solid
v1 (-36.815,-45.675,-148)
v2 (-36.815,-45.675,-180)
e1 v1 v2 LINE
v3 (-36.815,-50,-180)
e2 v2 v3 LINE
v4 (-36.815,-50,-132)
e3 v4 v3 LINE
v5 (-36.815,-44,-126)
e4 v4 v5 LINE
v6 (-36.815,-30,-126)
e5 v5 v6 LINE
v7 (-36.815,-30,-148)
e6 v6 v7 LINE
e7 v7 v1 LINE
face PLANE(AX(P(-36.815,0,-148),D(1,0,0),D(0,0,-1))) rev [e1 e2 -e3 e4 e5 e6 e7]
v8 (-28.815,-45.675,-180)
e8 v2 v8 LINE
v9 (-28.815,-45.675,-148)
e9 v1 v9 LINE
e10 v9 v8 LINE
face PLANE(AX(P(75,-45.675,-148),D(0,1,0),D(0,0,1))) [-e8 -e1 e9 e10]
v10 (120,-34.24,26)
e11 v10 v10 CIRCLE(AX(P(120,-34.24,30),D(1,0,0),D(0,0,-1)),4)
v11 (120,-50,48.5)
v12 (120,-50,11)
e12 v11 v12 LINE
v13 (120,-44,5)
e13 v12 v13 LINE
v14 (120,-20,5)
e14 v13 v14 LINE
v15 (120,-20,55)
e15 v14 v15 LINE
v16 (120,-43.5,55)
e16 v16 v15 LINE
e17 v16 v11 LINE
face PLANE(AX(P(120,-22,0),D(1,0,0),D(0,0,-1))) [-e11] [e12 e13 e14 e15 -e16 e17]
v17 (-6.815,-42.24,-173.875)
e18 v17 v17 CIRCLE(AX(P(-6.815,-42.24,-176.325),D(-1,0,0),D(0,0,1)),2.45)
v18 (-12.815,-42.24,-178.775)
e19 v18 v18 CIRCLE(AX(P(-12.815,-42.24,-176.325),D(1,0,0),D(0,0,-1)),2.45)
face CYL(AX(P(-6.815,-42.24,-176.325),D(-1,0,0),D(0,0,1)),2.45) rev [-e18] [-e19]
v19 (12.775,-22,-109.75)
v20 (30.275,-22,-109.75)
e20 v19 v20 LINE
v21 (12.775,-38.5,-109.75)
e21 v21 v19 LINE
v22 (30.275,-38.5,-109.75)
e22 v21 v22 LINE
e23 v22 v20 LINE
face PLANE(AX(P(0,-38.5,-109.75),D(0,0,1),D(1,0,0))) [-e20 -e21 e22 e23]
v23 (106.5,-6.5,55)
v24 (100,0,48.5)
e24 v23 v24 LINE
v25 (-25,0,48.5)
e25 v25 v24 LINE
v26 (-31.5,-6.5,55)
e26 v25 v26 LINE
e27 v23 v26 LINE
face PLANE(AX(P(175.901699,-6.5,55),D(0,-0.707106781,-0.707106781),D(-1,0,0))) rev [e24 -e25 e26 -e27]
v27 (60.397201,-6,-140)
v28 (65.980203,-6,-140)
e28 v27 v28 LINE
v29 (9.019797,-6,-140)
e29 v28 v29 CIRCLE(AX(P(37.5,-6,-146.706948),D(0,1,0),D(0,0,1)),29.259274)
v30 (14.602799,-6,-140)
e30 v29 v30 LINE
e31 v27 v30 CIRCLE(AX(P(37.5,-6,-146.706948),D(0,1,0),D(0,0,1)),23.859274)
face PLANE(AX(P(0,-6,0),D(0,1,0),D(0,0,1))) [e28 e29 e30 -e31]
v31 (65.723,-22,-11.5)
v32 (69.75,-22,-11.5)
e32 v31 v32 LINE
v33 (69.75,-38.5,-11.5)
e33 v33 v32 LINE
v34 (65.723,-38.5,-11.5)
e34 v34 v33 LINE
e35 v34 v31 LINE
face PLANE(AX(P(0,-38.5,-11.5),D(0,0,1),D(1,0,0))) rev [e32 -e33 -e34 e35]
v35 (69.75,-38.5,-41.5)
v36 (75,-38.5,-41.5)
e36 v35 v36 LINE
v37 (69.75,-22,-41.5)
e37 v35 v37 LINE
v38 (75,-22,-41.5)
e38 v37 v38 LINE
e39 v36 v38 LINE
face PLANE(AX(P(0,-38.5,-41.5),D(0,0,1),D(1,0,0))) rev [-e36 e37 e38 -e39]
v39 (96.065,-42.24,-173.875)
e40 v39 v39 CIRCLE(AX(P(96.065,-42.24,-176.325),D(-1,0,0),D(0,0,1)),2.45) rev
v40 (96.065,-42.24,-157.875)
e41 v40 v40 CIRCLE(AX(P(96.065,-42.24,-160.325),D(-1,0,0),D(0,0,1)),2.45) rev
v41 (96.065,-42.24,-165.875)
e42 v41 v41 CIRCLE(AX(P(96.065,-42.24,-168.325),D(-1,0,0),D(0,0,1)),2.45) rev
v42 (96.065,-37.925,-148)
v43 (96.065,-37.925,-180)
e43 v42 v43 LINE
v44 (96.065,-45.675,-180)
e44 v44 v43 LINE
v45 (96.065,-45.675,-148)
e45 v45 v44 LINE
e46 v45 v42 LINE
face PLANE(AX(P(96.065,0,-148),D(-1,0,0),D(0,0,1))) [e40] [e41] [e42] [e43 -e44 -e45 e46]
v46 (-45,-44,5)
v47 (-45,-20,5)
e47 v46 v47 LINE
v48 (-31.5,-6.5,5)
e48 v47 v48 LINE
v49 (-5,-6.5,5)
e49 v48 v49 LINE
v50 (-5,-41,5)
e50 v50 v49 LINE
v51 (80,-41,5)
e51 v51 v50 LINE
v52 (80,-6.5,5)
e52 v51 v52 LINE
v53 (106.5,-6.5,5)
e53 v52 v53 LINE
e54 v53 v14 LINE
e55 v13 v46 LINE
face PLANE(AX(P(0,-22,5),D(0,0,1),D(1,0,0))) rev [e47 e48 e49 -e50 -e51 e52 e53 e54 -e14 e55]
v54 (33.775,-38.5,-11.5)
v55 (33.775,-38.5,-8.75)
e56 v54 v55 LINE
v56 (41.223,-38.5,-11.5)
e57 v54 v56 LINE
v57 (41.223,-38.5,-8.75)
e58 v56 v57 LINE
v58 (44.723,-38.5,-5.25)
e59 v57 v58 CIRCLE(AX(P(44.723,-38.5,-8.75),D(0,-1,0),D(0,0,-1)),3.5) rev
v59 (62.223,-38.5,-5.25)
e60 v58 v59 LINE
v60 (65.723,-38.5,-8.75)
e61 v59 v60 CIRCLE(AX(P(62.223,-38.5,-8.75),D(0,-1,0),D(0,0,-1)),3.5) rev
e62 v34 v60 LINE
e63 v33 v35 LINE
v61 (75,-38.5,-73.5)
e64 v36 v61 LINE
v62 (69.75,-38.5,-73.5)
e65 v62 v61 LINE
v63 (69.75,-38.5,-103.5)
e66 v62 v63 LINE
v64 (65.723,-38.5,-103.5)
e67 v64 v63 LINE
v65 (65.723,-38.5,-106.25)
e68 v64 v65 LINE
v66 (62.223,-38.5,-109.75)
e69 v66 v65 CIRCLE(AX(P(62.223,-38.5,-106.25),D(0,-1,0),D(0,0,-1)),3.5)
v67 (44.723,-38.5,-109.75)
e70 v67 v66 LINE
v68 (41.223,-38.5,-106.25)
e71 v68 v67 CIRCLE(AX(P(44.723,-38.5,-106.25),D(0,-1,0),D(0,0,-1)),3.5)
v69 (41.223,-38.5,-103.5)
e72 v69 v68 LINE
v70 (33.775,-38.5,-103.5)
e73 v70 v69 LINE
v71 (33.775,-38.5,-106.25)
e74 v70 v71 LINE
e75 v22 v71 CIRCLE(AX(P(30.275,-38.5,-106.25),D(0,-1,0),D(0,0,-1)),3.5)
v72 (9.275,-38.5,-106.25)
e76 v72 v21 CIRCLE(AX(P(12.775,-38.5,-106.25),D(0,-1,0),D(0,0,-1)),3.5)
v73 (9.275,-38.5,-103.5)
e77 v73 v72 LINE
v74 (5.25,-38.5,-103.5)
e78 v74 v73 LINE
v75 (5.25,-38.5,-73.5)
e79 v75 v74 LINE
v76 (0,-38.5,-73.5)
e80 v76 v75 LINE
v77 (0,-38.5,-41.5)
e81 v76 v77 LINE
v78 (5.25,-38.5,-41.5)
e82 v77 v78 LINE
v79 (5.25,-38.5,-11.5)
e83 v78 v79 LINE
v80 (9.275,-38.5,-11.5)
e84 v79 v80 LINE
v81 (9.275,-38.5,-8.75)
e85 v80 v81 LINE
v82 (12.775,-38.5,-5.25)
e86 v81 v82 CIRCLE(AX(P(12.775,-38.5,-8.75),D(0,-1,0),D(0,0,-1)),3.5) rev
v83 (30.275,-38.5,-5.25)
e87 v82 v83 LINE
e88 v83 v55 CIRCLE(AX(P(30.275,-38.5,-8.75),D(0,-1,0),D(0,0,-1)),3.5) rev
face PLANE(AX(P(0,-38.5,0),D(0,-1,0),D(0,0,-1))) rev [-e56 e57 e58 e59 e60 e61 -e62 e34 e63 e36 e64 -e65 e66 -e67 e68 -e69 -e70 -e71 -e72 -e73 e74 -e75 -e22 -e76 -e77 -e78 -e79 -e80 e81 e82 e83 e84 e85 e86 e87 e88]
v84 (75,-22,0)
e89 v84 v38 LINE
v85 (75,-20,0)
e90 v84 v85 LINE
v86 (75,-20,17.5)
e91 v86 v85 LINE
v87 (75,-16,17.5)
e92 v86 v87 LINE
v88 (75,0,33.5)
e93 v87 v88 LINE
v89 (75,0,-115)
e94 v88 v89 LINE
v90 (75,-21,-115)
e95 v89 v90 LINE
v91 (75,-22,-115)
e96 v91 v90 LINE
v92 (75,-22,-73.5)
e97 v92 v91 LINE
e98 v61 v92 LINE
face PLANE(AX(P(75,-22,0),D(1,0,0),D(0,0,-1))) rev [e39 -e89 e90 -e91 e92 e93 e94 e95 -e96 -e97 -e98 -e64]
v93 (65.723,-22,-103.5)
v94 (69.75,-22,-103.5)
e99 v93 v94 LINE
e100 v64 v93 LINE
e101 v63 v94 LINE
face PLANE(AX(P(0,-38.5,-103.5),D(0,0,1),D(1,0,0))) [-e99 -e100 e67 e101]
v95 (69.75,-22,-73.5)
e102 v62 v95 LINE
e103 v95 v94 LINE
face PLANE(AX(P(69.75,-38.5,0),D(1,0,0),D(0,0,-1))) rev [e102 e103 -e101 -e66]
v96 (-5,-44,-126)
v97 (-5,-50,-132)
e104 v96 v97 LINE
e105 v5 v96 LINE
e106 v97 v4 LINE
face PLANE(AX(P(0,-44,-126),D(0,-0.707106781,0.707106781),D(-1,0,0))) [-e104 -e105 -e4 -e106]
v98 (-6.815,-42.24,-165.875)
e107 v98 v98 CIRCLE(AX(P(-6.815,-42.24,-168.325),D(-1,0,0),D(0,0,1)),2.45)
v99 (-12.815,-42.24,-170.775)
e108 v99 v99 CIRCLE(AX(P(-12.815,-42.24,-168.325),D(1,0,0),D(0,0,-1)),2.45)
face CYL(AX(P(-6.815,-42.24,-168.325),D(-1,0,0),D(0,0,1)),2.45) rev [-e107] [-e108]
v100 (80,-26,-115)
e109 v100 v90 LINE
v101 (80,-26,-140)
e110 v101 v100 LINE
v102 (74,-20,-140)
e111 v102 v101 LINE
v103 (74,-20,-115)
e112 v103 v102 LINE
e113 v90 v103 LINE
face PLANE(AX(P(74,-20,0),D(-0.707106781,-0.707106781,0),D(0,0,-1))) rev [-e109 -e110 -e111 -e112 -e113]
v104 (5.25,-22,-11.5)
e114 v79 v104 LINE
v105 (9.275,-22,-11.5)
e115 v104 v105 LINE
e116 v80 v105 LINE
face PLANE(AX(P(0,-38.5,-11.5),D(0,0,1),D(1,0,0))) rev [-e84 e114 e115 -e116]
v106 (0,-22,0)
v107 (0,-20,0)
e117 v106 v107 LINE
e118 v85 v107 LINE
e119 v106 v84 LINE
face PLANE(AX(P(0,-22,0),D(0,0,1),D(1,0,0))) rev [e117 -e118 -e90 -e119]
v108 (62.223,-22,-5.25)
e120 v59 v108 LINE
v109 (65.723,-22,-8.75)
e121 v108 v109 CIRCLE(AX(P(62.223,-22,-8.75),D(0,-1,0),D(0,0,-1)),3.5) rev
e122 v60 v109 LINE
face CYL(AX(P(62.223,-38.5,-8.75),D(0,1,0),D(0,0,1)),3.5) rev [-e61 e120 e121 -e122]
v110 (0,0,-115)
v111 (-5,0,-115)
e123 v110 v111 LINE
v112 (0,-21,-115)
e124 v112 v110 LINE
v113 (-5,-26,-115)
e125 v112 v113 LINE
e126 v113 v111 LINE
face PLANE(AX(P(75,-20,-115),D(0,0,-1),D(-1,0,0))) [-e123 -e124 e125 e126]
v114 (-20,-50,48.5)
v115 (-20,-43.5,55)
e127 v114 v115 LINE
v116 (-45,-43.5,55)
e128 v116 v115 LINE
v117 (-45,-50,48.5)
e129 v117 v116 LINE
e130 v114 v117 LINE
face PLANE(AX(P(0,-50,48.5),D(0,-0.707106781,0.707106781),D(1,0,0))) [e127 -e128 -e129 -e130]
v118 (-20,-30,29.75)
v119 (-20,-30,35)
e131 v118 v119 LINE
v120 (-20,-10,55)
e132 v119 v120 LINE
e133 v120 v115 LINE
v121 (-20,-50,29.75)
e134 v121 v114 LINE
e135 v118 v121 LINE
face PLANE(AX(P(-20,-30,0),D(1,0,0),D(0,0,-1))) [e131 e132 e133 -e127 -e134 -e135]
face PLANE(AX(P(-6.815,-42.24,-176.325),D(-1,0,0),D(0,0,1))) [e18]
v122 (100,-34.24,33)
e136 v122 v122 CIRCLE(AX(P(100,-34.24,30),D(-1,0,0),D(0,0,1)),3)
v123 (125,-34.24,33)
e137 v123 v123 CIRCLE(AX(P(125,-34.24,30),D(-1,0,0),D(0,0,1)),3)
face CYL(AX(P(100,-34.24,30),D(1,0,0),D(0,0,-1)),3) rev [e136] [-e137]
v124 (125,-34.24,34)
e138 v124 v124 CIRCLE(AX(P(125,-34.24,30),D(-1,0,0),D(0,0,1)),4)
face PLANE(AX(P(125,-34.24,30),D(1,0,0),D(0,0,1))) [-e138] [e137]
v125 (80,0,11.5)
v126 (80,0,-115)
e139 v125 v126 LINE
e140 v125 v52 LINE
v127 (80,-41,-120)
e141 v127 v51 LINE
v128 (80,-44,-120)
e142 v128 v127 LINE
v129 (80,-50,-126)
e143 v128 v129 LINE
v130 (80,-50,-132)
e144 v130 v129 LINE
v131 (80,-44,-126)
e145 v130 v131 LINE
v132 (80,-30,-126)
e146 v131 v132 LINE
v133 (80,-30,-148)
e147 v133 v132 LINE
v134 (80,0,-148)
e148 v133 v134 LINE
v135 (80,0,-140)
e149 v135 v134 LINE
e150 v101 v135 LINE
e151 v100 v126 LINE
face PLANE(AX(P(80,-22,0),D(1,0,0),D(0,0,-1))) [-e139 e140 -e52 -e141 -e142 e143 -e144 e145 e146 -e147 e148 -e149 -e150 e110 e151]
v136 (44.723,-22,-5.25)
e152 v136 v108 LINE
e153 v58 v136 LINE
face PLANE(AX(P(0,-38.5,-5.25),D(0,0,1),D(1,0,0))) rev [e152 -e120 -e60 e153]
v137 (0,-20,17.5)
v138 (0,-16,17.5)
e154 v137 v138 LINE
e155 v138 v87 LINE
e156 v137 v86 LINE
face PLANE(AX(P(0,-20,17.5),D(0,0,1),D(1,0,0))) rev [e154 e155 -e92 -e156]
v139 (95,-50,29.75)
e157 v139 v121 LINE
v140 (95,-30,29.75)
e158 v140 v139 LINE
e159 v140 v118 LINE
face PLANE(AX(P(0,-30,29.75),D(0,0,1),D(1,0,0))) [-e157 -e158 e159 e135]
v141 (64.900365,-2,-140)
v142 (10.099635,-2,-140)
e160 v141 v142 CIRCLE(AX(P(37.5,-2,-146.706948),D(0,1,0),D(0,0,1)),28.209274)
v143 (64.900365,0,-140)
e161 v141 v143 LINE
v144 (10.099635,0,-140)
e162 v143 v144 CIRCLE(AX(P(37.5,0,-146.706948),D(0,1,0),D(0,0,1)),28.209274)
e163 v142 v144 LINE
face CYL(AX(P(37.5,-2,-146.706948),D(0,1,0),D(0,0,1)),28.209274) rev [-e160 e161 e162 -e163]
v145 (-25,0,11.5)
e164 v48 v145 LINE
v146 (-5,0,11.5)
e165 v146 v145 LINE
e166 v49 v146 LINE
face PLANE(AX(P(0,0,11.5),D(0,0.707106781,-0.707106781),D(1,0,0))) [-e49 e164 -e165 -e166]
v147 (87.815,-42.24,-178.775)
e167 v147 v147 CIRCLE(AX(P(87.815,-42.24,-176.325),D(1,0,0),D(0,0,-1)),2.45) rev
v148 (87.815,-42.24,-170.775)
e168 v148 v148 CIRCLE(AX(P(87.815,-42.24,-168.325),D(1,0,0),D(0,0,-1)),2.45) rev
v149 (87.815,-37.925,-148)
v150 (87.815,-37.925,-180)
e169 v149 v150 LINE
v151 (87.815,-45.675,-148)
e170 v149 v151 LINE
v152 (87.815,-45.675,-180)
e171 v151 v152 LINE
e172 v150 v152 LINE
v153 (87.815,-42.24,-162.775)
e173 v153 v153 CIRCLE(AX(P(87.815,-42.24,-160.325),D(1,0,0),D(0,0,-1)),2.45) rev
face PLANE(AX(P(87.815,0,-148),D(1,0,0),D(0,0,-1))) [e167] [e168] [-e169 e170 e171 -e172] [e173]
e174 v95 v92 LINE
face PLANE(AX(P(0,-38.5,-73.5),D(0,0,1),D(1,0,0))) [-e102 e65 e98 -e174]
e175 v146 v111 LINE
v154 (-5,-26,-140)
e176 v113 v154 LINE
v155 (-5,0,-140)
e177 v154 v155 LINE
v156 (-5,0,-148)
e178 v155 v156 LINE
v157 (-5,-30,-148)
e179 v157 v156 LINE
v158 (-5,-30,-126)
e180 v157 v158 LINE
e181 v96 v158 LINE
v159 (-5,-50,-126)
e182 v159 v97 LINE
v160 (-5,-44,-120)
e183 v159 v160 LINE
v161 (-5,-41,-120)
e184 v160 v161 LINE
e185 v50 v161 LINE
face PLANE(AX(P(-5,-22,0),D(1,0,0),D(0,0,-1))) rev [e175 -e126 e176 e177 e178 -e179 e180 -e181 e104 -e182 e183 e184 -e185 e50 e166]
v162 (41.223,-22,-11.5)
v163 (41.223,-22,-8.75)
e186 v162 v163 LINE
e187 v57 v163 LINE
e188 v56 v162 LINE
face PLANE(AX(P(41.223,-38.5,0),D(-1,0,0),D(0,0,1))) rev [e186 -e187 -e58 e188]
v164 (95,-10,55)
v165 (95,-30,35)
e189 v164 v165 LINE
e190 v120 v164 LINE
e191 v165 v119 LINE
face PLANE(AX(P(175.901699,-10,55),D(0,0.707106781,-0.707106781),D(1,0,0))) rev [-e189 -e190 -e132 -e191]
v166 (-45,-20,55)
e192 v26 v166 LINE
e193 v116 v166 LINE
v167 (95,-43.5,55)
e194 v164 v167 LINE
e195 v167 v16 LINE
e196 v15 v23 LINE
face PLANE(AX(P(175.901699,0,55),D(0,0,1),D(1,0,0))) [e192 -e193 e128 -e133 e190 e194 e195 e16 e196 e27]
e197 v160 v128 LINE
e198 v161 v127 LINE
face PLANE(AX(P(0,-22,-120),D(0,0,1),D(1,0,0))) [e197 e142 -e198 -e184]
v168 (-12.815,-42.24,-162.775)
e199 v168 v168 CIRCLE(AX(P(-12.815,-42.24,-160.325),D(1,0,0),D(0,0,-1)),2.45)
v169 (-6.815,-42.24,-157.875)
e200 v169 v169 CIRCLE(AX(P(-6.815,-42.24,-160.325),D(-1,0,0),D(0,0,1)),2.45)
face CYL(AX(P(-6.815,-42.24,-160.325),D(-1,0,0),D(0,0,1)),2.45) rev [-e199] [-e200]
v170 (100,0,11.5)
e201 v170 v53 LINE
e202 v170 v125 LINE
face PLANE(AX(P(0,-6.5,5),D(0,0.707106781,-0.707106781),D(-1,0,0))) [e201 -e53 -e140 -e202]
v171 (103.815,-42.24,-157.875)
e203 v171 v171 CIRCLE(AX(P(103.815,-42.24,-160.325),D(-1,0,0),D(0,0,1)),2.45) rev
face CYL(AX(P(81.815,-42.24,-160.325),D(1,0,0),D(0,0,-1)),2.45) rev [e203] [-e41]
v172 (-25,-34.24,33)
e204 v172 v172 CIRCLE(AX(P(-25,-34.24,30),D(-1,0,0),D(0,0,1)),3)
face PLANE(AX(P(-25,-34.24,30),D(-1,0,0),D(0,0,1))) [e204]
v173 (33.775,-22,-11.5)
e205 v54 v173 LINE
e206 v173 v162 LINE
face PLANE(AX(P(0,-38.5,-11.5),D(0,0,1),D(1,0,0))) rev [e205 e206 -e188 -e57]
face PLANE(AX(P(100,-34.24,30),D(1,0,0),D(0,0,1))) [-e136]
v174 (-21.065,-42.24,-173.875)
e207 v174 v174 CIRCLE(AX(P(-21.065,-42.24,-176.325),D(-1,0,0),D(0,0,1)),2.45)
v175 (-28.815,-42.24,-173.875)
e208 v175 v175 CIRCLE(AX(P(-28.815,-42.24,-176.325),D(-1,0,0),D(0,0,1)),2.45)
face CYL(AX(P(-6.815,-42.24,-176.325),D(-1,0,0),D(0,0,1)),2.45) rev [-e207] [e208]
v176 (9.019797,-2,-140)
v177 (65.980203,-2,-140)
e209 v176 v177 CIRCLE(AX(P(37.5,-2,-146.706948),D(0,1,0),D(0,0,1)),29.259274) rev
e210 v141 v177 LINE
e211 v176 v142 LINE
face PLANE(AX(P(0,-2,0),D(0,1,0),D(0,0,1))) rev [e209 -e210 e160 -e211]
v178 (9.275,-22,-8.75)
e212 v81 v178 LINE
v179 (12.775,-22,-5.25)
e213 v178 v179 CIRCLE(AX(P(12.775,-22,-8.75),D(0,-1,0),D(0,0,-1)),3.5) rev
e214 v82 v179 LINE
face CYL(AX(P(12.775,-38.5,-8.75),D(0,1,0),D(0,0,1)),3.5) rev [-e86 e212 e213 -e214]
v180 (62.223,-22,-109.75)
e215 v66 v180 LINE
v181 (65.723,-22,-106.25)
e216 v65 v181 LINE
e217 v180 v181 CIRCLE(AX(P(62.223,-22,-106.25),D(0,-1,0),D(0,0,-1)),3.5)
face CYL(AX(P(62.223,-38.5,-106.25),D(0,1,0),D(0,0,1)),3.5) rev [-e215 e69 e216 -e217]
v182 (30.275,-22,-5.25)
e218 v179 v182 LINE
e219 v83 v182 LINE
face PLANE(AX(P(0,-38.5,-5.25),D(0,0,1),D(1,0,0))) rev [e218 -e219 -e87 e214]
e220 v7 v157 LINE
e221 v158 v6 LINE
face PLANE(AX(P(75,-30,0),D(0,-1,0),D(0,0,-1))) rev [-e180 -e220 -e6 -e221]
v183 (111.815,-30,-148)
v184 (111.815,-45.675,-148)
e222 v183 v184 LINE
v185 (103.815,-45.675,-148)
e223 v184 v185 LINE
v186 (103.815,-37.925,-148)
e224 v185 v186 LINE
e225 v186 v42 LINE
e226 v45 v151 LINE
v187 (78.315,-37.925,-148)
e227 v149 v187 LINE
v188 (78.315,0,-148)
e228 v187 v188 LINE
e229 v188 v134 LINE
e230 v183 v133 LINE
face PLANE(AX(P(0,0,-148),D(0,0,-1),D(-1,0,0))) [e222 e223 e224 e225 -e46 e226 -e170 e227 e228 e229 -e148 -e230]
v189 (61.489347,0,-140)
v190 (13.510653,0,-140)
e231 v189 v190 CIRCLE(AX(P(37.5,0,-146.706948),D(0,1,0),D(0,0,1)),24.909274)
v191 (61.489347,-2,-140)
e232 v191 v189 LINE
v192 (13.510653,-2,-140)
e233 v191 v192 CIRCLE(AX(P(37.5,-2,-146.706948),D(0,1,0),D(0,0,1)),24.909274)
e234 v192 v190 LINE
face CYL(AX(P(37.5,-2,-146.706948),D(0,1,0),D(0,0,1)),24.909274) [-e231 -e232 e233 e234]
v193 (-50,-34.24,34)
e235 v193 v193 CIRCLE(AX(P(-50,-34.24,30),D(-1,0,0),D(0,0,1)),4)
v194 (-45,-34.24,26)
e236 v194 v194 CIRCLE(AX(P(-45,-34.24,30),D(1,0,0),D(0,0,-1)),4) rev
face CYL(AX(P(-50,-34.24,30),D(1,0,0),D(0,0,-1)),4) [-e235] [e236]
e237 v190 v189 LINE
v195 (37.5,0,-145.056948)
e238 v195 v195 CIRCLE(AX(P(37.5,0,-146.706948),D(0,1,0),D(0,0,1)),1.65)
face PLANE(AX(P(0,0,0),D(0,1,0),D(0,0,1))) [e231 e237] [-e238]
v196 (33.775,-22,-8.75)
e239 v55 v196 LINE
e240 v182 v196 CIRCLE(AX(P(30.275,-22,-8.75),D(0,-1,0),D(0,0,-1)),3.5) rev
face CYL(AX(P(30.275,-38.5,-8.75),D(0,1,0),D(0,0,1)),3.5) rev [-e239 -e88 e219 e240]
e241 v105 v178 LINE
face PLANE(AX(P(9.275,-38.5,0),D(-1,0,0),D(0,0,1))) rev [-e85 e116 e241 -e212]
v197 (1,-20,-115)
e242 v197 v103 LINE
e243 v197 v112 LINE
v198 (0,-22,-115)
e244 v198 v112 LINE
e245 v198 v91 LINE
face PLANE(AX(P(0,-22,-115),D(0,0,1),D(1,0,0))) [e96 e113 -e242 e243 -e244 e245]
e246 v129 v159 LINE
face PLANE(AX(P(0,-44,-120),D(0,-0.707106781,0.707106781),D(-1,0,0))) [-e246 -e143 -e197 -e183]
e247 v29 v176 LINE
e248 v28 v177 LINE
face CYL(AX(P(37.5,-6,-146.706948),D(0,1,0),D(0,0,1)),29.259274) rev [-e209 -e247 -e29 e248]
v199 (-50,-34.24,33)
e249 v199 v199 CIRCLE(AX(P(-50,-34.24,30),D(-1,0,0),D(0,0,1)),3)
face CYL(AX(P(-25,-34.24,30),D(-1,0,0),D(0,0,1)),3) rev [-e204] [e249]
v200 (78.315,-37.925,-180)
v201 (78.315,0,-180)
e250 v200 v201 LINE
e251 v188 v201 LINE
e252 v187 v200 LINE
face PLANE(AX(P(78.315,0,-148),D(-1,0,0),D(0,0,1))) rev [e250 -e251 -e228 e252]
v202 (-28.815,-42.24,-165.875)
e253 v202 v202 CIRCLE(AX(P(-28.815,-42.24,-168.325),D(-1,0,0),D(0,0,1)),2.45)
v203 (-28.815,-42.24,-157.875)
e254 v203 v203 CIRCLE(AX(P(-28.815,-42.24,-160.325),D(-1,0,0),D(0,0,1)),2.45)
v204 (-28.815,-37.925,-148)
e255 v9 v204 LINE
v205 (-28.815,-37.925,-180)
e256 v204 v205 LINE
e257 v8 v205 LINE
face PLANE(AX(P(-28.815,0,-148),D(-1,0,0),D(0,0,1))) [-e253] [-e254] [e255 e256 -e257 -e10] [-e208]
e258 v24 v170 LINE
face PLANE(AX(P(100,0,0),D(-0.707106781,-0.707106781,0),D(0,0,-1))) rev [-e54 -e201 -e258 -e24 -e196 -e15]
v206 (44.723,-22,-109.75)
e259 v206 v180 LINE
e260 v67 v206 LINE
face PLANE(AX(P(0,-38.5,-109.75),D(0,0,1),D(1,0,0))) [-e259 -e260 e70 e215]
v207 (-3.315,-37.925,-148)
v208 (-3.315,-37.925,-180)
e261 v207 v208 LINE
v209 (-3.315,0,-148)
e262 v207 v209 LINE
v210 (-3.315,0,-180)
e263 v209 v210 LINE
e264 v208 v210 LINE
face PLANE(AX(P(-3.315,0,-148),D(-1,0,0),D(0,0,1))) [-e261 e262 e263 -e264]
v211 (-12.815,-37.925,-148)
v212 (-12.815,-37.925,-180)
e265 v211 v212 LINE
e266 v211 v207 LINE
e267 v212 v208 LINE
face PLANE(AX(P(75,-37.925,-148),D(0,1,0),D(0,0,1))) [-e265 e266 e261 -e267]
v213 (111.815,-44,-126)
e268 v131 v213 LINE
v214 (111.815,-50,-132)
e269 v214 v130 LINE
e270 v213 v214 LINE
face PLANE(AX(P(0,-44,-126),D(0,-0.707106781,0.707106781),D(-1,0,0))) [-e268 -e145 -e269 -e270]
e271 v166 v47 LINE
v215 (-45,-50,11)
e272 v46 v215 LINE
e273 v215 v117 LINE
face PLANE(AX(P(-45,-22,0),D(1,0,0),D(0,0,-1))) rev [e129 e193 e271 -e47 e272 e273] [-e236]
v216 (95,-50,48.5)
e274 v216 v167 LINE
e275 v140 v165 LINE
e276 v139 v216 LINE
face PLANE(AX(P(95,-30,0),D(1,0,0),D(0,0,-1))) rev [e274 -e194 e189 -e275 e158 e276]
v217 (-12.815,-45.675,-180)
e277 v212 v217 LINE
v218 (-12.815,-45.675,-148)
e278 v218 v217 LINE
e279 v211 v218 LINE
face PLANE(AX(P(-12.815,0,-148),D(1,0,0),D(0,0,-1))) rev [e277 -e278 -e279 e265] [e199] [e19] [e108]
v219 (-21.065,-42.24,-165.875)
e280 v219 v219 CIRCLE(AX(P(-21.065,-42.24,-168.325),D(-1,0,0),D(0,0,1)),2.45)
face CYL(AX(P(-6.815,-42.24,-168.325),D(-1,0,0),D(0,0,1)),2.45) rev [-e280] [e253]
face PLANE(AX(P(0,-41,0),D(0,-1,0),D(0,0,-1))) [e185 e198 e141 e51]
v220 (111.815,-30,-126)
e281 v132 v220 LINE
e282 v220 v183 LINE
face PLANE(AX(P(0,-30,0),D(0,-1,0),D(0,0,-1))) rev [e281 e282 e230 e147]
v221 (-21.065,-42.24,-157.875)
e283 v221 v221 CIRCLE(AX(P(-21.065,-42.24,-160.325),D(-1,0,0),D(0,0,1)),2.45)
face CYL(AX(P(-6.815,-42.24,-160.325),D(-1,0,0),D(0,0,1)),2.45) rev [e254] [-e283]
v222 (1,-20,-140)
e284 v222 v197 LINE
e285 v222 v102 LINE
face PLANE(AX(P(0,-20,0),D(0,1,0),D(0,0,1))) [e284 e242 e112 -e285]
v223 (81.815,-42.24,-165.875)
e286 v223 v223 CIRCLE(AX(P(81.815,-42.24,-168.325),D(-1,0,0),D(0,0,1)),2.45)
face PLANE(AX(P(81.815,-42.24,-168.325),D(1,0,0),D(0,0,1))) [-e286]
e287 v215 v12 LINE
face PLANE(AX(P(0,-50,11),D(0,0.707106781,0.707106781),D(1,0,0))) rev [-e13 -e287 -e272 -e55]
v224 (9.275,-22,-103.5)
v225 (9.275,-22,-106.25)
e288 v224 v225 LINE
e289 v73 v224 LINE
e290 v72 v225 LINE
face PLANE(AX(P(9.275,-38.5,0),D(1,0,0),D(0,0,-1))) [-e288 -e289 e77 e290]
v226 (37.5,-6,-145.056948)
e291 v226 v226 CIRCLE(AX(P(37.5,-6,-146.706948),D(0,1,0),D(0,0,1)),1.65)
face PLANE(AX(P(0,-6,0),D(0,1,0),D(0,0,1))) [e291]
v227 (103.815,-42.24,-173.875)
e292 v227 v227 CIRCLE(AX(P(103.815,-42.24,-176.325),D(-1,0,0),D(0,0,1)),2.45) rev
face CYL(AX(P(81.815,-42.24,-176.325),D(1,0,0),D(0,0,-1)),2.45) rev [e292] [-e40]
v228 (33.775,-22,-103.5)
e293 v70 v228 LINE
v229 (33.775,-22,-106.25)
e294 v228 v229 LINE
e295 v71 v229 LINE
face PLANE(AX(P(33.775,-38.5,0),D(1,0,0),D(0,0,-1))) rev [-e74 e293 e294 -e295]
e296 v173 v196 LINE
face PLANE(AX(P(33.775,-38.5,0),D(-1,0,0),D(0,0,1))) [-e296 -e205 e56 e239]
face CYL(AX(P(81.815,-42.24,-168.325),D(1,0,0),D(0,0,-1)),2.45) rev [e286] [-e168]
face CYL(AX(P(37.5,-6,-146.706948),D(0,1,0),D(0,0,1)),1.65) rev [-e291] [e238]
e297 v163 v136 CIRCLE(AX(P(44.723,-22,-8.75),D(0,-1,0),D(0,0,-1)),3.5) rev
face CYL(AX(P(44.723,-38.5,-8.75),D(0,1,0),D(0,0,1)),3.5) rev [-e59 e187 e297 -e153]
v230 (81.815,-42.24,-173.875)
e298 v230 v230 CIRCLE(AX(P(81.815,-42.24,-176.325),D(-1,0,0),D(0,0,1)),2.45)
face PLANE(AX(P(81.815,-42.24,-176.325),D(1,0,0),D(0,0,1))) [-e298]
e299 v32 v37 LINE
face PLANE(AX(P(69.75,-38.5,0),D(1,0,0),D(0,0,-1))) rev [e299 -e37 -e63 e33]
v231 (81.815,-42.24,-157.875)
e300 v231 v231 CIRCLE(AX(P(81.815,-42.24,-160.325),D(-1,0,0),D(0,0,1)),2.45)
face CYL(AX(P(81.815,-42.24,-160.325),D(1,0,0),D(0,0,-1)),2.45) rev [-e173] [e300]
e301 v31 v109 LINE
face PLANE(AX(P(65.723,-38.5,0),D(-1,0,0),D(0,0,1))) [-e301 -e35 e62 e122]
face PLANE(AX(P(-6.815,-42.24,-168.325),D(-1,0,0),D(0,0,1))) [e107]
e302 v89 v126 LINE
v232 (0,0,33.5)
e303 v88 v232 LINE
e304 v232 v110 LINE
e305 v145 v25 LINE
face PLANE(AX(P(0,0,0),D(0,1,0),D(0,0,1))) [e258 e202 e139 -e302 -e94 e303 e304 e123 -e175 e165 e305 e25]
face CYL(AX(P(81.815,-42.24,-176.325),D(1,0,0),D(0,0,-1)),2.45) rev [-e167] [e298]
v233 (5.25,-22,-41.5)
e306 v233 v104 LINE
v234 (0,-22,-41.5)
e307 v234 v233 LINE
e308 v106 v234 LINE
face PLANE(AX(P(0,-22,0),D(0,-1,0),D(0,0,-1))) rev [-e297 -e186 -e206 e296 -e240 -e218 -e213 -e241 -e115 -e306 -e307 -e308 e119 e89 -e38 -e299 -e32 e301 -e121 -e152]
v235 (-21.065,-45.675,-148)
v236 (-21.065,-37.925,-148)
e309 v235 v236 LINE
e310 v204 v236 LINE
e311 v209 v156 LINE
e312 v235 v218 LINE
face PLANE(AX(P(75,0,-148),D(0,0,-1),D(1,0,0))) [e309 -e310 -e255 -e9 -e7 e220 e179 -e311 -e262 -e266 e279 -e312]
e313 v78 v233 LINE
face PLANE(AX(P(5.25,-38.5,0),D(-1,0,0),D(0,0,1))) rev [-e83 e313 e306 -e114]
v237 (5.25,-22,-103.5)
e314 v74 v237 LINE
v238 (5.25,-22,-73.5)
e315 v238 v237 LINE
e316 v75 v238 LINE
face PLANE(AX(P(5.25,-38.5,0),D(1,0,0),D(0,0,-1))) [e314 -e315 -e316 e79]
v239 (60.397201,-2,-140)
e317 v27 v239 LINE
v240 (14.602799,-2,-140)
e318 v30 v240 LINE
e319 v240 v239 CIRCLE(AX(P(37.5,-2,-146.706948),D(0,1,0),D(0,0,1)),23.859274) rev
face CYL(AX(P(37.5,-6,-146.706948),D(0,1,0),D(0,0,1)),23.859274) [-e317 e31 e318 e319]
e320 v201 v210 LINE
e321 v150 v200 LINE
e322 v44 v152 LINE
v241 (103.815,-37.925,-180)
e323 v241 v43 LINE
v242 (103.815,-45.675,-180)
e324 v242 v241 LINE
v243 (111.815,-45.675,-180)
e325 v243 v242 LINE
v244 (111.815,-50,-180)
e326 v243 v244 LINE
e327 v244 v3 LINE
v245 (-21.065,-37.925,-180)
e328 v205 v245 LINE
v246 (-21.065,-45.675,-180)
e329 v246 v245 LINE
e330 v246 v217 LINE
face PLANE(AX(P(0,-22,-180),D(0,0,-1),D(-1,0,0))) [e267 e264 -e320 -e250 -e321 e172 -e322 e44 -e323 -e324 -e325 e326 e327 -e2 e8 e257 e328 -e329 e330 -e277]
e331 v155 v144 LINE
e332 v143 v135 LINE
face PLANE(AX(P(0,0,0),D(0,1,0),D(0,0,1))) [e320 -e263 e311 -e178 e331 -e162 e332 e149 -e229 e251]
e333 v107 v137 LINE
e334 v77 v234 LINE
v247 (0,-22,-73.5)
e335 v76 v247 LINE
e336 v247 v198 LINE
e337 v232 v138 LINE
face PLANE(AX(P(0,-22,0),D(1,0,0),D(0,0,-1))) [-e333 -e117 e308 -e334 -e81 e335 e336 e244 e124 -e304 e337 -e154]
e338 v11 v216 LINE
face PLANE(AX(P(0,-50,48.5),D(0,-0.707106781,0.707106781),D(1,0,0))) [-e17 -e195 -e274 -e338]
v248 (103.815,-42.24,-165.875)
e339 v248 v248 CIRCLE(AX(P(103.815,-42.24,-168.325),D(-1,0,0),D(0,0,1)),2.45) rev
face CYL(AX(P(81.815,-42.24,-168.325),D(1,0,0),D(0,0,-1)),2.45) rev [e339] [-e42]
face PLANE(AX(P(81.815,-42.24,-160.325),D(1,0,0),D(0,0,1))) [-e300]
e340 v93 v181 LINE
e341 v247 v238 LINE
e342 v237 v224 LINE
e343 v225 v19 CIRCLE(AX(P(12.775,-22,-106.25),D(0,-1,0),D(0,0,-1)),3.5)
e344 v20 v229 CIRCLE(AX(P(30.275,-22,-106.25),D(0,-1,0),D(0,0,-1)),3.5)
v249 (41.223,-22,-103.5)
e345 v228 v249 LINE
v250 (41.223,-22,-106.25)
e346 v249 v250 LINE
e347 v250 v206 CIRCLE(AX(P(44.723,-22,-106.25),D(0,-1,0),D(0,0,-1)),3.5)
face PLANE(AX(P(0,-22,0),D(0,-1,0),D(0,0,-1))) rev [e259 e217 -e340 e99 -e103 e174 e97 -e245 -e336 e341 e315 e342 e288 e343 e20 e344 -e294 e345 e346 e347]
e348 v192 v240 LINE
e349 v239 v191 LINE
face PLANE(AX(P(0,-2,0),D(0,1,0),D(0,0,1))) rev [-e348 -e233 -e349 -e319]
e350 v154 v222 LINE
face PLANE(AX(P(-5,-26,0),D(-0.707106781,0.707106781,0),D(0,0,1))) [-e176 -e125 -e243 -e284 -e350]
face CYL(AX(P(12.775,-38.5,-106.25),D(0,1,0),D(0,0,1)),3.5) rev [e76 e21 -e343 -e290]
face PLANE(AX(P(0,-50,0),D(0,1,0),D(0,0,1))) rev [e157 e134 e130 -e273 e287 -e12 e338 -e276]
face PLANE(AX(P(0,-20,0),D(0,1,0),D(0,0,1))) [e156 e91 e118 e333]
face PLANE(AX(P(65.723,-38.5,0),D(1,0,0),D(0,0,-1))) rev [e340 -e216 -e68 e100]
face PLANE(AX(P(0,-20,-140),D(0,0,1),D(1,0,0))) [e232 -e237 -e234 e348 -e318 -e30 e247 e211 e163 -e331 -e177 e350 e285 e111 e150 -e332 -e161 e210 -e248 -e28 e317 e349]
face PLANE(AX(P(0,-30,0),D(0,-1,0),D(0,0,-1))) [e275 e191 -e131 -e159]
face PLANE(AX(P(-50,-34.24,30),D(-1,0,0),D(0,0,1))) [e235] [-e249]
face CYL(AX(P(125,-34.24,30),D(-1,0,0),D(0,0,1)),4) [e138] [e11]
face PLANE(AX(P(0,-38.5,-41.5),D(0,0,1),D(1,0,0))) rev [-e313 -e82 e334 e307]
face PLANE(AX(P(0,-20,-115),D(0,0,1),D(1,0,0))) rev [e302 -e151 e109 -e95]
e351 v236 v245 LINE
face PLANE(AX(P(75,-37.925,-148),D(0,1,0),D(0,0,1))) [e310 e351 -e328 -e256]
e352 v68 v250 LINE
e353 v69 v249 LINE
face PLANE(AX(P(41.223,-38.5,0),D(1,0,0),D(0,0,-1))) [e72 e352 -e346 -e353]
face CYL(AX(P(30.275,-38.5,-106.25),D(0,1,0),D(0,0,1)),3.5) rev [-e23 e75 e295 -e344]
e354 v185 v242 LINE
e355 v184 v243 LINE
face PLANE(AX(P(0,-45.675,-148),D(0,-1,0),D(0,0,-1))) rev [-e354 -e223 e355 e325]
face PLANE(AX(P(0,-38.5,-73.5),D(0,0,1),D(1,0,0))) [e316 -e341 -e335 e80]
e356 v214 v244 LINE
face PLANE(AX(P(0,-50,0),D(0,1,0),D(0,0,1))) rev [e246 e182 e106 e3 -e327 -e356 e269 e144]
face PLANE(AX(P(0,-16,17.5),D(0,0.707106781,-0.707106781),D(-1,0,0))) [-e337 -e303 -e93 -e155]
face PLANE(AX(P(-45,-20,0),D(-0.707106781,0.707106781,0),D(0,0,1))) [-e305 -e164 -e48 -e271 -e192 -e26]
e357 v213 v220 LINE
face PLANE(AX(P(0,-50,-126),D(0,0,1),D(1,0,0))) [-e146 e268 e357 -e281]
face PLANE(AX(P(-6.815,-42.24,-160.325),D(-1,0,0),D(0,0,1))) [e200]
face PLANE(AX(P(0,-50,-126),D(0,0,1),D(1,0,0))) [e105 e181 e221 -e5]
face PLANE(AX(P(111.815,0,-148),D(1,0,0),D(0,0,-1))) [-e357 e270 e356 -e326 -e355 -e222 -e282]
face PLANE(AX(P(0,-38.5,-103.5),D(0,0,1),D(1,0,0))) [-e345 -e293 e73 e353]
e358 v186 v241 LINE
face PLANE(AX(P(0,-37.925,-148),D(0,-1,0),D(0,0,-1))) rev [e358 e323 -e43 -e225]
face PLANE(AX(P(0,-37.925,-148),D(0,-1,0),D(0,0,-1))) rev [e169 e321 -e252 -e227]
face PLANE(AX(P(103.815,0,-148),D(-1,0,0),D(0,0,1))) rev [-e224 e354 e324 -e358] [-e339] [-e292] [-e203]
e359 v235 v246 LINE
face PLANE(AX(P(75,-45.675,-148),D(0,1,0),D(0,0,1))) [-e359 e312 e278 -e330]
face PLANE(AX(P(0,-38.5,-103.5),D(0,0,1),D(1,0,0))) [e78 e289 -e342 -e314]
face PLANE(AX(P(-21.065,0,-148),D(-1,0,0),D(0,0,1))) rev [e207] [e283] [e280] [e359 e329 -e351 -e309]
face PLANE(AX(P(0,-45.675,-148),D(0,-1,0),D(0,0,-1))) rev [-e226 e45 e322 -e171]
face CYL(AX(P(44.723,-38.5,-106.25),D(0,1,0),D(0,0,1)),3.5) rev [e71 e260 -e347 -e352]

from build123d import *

# Parameters (mm, degrees)
SKETCH1_W           = 40
SKETCH1_H           = 60
SKETCH1_W_2         = 85
SKETCH1_H_2         = 125
SKETCH1_W_3         = 75
SKETCH1_H_3         = 115
SKETCH1_H_4         = 25
BOSS_EXTRUDE1_DEPTH = 22
SKETCH2_W           = 85
SKETCH2_H           = 125
BOSS_EXTRUDE2_DEPTH = 16.5
SKETCH4_W           = 85
SKETCH4_H           = 125
BOSS_EXTRUDE3_DEPTH = 2.5
BOSS_EXTRUDE4_DEPTH = 50
SKETCH9_W           = 40
SKETCH9_H           = 6
CUT_EXTRUDE2_DEPTH  = 50
SKETCH8_W           = 8.185
SKETCH8_H           = 4.325
SKETCH8_W_2         = 9.5
SKETCH8_H_2         = 37.925
CUT_EXTRUDE1_DEPTH  = 32
SKETCH10_W          = 40
SKETCH10_H          = 22
CUT_EXTRUDE3_DEPTH  = 30
SKETCH11_W          = 22
SKETCH11_H          = 20
CUT_EXTRUDE4_DEPTH  = 8.185
SKETCH12_W          = 75
SKETCH12_H          = 25
SKETCH12_W_2        = 5
CUT_EXTRUDE5_DEPTH  = 20
CHAMFER1_SIZE       = 6
CHAMFER2_SIZE       = 6
SKETCH14_W          = 75
SKETCH14_H          = 17.5
CUT_EXTRUDE6_DEPTH  = 20
SKETCH18_W          = 25
SKETCH18_H          = 50
BOSS_EXTRUDE5_DEPTH = 165
CHAMFER3_SIZE       = 16
SKETCH19_R          = 3
CUT_EXTRUDE7_DEPTH  = 20
CHAMFER4_SIZE       = 6.5
CHAMFER5_SIZE       = 6.5
SKETCH20_W          = 115
SKETCH20_H          = 18.75
SKETCH20_H_2        = 6.5
CUT_EXTRUDE8_DEPTH  = 20
CHAMFER6_SIZE       = 6.5
CHAMFER8_SIZE       = 20
CHAMFER9_SIZE       = 20
SKETCH21_R          = 2.45
CUT_EXTRUDE9_DEPTH  = 30
SKETCH22_R          = 4
SKETCH22_R_2        = 3
BOSS_EXTRUDE6_DEPTH = 5
SKETCH23_R          = 2.7
SKETCH23_R_2        = 1.65
CUT_EXTRUDE10_DEPTH = 6
BOSS_EXTRUDE7_START = -2
BOSS_EXTRUDE7_DEPTH = 2


# Read off the part's stored shape, not the designer's step: Boss-Extrude7
# Some blends are built 0.0001 mm under size
with BuildPart() as part:
    # Sketch1 → Boss-Extrude1 (new body)
    # profile 1 of 7: a face of its own
    with BuildSketch(Plane(origin=(0, 0, 0), x_dir=(1, 0, 0), z_dir=(0, 1, 0))):
        with Locations((-25, 150)):
            Rectangle(SKETCH1_W, SKETCH1_H)
    # profile 2 of 7: a face of its own
    with BuildSketch(Plane(origin=(0, 0, 0), x_dir=(1, 0, 0), z_dir=(0, 1, 0))):
        with Locations((37.5, 150)):
            Rectangle(SKETCH1_W_2, SKETCH1_H)
    # profile 3 of 7: a face of its own
    with BuildSketch(Plane(origin=(0, 0, 0), x_dir=(1, 0, 0), z_dir=(0, 1, 0))):
        with Locations((100, 150)):
            Rectangle(SKETCH1_W, SKETCH1_H)
    # profile 4 of 7: a face of its own
    with BuildSketch(Plane(origin=(0, 0, 0), x_dir=(1, 0, 0), z_dir=(0, 1, 0))):
        with Locations((37.5, 57.5)):
            Rectangle(SKETCH1_W_2, SKETCH1_H_2)
        with Locations((37.5, 57.5)):
            Rectangle(SKETCH1_W_3, SKETCH1_H_3, mode=Mode.SUBTRACT)
    # profile 5 of 7: a face of its own
    with BuildSketch(Plane(origin=(0, 0, 0), x_dir=(1, 0, 0), z_dir=(0, 1, 0))):
        with Locations((-25, -17.5)):
            Rectangle(SKETCH1_W, SKETCH1_H_4)
    # profile 6 of 7: a face of its own
    with BuildSketch(Plane(origin=(0, 0, 0), x_dir=(1, 0, 0), z_dir=(0, 1, 0))):
        with Locations((37.5, -17.5)):
            Rectangle(SKETCH1_W_2, SKETCH1_H_4)
    # profile 7 of 7: a face of its own
    with BuildSketch(Plane(origin=(0, 0, 0), x_dir=(1, 0, 0), z_dir=(0, 1, 0))):
        with Locations((100, -17.5)):
            Rectangle(SKETCH1_W, SKETCH1_H_4)
    extrude(amount=-BOSS_EXTRUDE1_DEPTH)

    # Sketch2 → Boss-Extrude2 (add)
    with BuildSketch(Plane.XZ.offset(22)):
        with Locations((37.5, -57.5)):
            Rectangle(SKETCH2_W, SKETCH2_H)
        with BuildLine():
            Line((5.25, -11.5), (9.275, -11.5))
            Line((9.275, -11.5), (9.275, -8.75))
            ThreePointArc((9.275, -8.75), (10.300126266, -6.275126266), (12.775, -5.25))
            Line((12.775, -5.25), (30.275, -5.25))
            ThreePointArc((30.275, -5.25), (32.749873734, -6.275126266), (33.775, -8.75))
            Line((33.775, -8.75), (33.775, -11.5))
            Line((33.775, -11.5), (41.223, -11.5))
            Line((41.223, -11.5), (41.223, -8.75))
            ThreePointArc((41.223, -8.75), (42.248126266, -6.275126266), (44.723, -5.25))
            Line((44.723, -5.25), (62.223, -5.25))
            ThreePointArc((62.223, -5.25), (64.697873734, -6.275126266), (65.723, -8.75))
            Line((65.723, -8.75), (65.723, -11.5))
            Line((65.723, -11.5), (69.75, -11.5))
            Line((69.75, -11.5), (69.75, -41.5))
            Line((69.75, -41.5), (75, -41.5))
            Line((75, -41.5), (75, -73.5))
            Line((75, -73.5), (69.75, -73.5))
            Line((69.75, -73.5), (69.75, -103.5))
            Line((69.75, -103.5), (65.723, -103.5))
            Line((65.723, -103.5), (65.723, -106.25))
            ThreePointArc((65.723, -106.25), (64.697873734, -108.724873734), (62.223, -109.75))
            Line((62.223, -109.75), (44.723, -109.75))
            ThreePointArc((44.723, -109.75), (42.248126266, -108.724873734), (41.223, -106.25))
            Line((41.223, -106.25), (41.223, -103.5))
            Line((41.223, -103.5), (33.775, -103.5))
            Line((33.775, -103.5), (33.775, -106.25))
            ThreePointArc((33.775, -106.25), (32.749873734, -108.724873734), (30.275, -109.75))
            Line((30.275, -109.75), (12.775, -109.75))
            ThreePointArc((12.775, -109.75), (10.300126266, -108.724873734), (9.275, -106.25))
            Line((9.275, -106.25), (9.275, -103.5))
            Line((9.275, -103.5), (5.25, -103.5))
            Line((5.25, -103.5), (5.25, -73.5))
            Line((5.25, -73.5), (0, -73.5))
            Line((0, -73.5), (0, -41.5))
            Line((0, -41.5), (5.25, -41.5))
            Line((5.25, -41.5), (5.25, -11.5))
        make_face(mode=Mode.SUBTRACT)
    extrude(amount=BOSS_EXTRUDE2_DEPTH)

    # Sketch4 → Boss-Extrude3 (add)
    with BuildSketch(Plane.XZ.offset(38.5)):
        with Locations((37.5, -57.5)):
            Rectangle(SKETCH4_W, SKETCH4_H)
    extrude(amount=BOSS_EXTRUDE3_DEPTH)

    # Sketch5 → Boss-Extrude4 (add)
    with BuildSketch(Plane(origin=(0, 0, 0), x_dir=(1, 0, 0), z_dir=(0, 1, 0))):
        Polygon((120, 180), (-45, 180), (-45, 120), (-5, 120), (80, 120), (120, 120), align=None)
        Polygon((-5, -5), (-45, -5), (-45, -30), (120, -30), (120, -5), (80, -5), align=None)
    extrude(amount=-BOSS_EXTRUDE4_DEPTH)

    # Sketch9 → Cut-Extrude2 (cut)
    with BuildSketch(Plane(origin=(0, 0, 0), x_dir=(1, 0, 0), z_dir=(0, 1, 0))):
        with Locations((-25, 123)):
            Rectangle(SKETCH9_W, SKETCH9_H)
        with Locations((100, 123)):
            Rectangle(SKETCH9_W, SKETCH9_H)
    extrude(amount=-CUT_EXTRUDE2_DEPTH, mode=Mode.SUBTRACT)

    # Sketch8 → Cut-Extrude1 (cut)
    with BuildSketch(Plane(origin=(0, 0, -180), x_dir=(-1, 0, 0), z_dir=(0, 0, -1))):
        Polygon((-87.815, 0), (-120, 0), (-120, -45.675), (-111.815, -45.675), (-103.815, -45.675), (-103.815, -37.925), (-96.065, -37.925), (-96.065, -45.675), (-87.815, -45.675), (-87.815, -37.925), align=None)
        with Locations((-115.9075, -47.8375)):
            Rectangle(SKETCH8_W, SKETCH8_H)
        with Locations((-83.065, -18.9625)):
            Rectangle(SKETCH8_W_2, SKETCH8_H_2)
    cut_extrude1 = extrude(amount=-CUT_EXTRUDE1_DEPTH, mode=Mode.SUBTRACT)

    # Sketch10 → Cut-Extrude3 (cut)
    with BuildSketch(Plane(origin=(0, 0, 0), x_dir=(1, 0, 0), z_dir=(0, 1, 0))):
        with Locations((100, 137)):
            Rectangle(SKETCH10_W, SKETCH10_H)
    cut_extrude3 = extrude(amount=-CUT_EXTRUDE3_DEPTH, mode=Mode.SUBTRACT)

    # Sketch11 → Cut-Extrude4 (cut)
    with BuildSketch(Plane(origin=(120, 0, 0), x_dir=(0, 0, -1), z_dir=(1, 0, 0))):
        with Locations((137, -40)):
            Rectangle(SKETCH11_W, SKETCH11_H)
    cut_extrude4 = extrude(amount=-CUT_EXTRUDE4_DEPTH, mode=Mode.SUBTRACT)

    # Sketch12 → Cut-Extrude5 (cut)
    with BuildSketch(Plane(origin=(0, 0, 0), x_dir=(1, 0, 0), z_dir=(0, 1, 0))):
        with Locations((37.5, 127.5)):
            Rectangle(SKETCH12_W, SKETCH12_H)
        with Locations((77.5, 127.5)):
            Rectangle(SKETCH12_W_2, SKETCH12_H)
    cut_extrude5 = extrude(amount=-CUT_EXTRUDE5_DEPTH, mode=Mode.SUBTRACT)

    # Mirror4: Cut-Extrude1, Cut-Extrude3, Cut-Extrude4, Cut-Extrude5 across plane
    add(cut_extrude1.mirror(Plane.ZY.offset(-37.5)), mode=Mode.SUBTRACT)
    add(cut_extrude3.mirror(Plane.ZY.offset(-37.5)), mode=Mode.SUBTRACT)
    add(cut_extrude4.mirror(Plane.ZY.offset(-37.5)), mode=Mode.SUBTRACT)
    add(cut_extrude5.mirror(Plane.ZY.offset(-37.5)), mode=Mode.SUBTRACT)

    # Chamfer1
    # the kernel refuses this chamfer: 6 mm, written as the material it takes off along each edge
    with BuildSketch(Plane(origin=(80, -20, -115), x_dir=(0.02749587661058678, -0.9996219169112968, 0), z_dir=(0, 0, -1))) as chamfer1_piece_1:
        Polygon((CHAMFER1_SIZE * 0.999621916911, CHAMFER1_SIZE * 0.0274958766106), (-CHAMFER1_SIZE * 0.0274958766106, CHAMFER1_SIZE * 0.999621916911), (0, 0), align=None)
    extrude(amount=25, mode=Mode.SUBTRACT)
    with BuildSketch(Plane(origin=(-5, -20, -115), x_dir=(-0.027495876610588648, -0.9996219169112965, 0), z_dir=(0, 0, -1))) as chamfer1_piece_2:
        Polygon((CHAMFER1_SIZE * 0.999621916911, -CHAMFER1_SIZE * 0.0274958766106), (-CHAMFER1_SIZE * 0.0274958766106, -CHAMFER1_SIZE * 0.999621916911), (0, 0), align=None)
    extrude(amount=25, mode=Mode.SUBTRACT)

    # Chamfer2
    chamfer2_edges = [part.edges().sort_by_distance(p)[0] for p in [
        (95.9075, -50, -126),
        (-20.9075, -50, -126),
        (37.5, -50, 5),
        (37.5, -50, -120),
    ]]
    chamfer(chamfer2_edges, length=CHAMFER2_SIZE - 0.0001)  # a hair under: the kernel refuses the full size

    # Sketch14 → Cut-Extrude6 (cut)
    with BuildSketch(Plane(origin=(0, 0, 0), x_dir=(1, 0, 0), z_dir=(0, 1, 0))):
        with Locations((37.5, -8.75)):
            Rectangle(SKETCH14_W, SKETCH14_H)
    extrude(amount=-CUT_EXTRUDE6_DEPTH, mode=Mode.SUBTRACT)

    # Sketch18 → Boss-Extrude5 (add)
    with BuildSketch(Plane.ZY.offset(45)):
        with Locations((42.5, -25)):
            Rectangle(SKETCH18_W, SKETCH18_H)
    extrude(amount=-BOSS_EXTRUDE5_DEPTH)

    # Chamfer3
    chamfer3_edges = [part.edges().sort_by_distance(p)[0] for p in [
        (37.5, 0, 17.5),
    ]]
    chamfer(chamfer3_edges, length=CHAMFER3_SIZE)

    # Sketch19 → Cut-Extrude7 (cut)
    with BuildSketch(Plane.ZY.offset(45)):
        with Locations((30, -34.24)):
            Circle(SKETCH19_R)
    cut_extrude7 = extrude(amount=-CUT_EXTRUDE7_DEPTH, mode=Mode.SUBTRACT)

    # Chamfer4
    chamfer4_edges = [part.edges().sort_by_distance(p)[0] for p in [
        (37.5, -50, 55),
    ]]
    chamfer(chamfer4_edges, length=CHAMFER4_SIZE)

    # Chamfer5
    chamfer5_edges = [part.edges().sort_by_distance(p)[0] for p in [
        (100, 0, 5),
        (-25, 0, 5),
    ]]
    chamfer(chamfer5_edges, length=CHAMFER5_SIZE)

    # Sketch20 → Cut-Extrude8 (cut)
    with BuildSketch(Plane.XZ.offset(50)):
        with Locations((37.5, 39.125)):
            Rectangle(SKETCH20_W, SKETCH20_H)
        with Locations((37.5, 51.75)):
            Rectangle(SKETCH20_W, SKETCH20_H_2)
    extrude(amount=-CUT_EXTRUDE8_DEPTH, mode=Mode.SUBTRACT)

    # Mirror5: Cut-Extrude7 across plane
    add(cut_extrude7.mirror(Plane.ZY.offset(-37.5)), mode=Mode.SUBTRACT)

    # Chamfer6
    chamfer6_edges = [part.edges().sort_by_distance(p)[0] for p in [
        (37.5, 0, 55),
    ]]
    chamfer(chamfer6_edges, length=CHAMFER6_SIZE)

    # Chamfer8
    chamfer8_edges = [part.edges().sort_by_distance(p)[0] for p in [
        (37.5, -30, 55),
    ]]
    chamfer(chamfer8_edges, length=CHAMFER8_SIZE)

    # Chamfer9
    chamfer9_edges = [part.edges().sort_by_distance(p)[0] for p in [
        (-45, 0, 30),
        (120, 0, 30),
    ]]
    chamfer(chamfer9_edges, length=CHAMFER9_SIZE)

    # Sketch21 → Cut-Extrude9 (cut)
    with BuildSketch(Plane.ZY.offset(36.815)):
        with Locations((-176.325, -42.24)):
            Circle(SKETCH21_R)
        with Locations((-168.325, -42.24)):
            Circle(SKETCH21_R)
        with Locations((-160.325, -42.24)):
            Circle(SKETCH21_R)
    cut_extrude9 = extrude(amount=-CUT_EXTRUDE9_DEPTH, mode=Mode.SUBTRACT)

    # Mirror6: Cut-Extrude9 across plane
    add(cut_extrude9.mirror(Plane.ZY.offset(-37.5)), mode=Mode.SUBTRACT)

    # Sketch22 → Boss-Extrude6 (add)
    with BuildSketch(Plane.ZY.offset(45)):
        with Locations(Location((30, -34.24, 0), (0, 0, 180))):
            Circle(SKETCH22_R)
        with Locations((30, -34.24)):
            Circle(SKETCH22_R_2, mode=Mode.SUBTRACT)
    boss_extrude6 = extrude(amount=BOSS_EXTRUDE6_DEPTH)

    # Mirror7: Boss-Extrude6 across plane
    add(boss_extrude6.mirror(Plane.ZY.offset(-37.5)))

    # Sketch23 → Cut-Extrude10 (cut)
    with BuildSketch(Plane(origin=(0, 0, 0), x_dir=(1, 0, 0), z_dir=(0, 1, 0))):
        with BuildLine():
            ThreePointArc((37.5, 175.966221554), (39.409188309, 175.175409863), (40.2, 173.266221554))
            ThreePointArc((40.2, 173.266221554), (39.409188309, 171.357033245), (37.5, 170.566221554))
            ThreePointArc((37.5, 170.566221554), (54.371054268, 163.578002065), (61.359273757, 146.706947797))
            ThreePointArc((61.359273757, 146.706947797), (61.117530795, 143.319148603), (60.397200604, 140))
            Line((60.397200604, 140), (65.980202809, 140))
            ThreePointArc((65.980202809, 140), (66.563853422, 143.330925719), (66.759273757, 146.706947797))
            ThreePointArc((66.759273757, 146.706947797), (58.189430886, 167.396378683), (37.5, 175.966221554))
        make_face()
        with BuildLine():
            ThreePointArc((37.5, 170.566221554), (34.8, 173.266221554), (37.5, 175.966221554))
            ThreePointArc((37.5, 175.966221554), (14.561544053, 164.870987534), (9.019797191, 140))
            Line((9.019797191, 140), (14.602799396, 140))
            ThreePointArc((14.602799396, 140), (18.404348037, 161.011528194), (37.5, 170.566221554))
        make_face()
        with Locations((37.5, 173.266221554)):
            Circle(SKETCH23_R)
        with Locations(Location((37.5, 146.706947797, 0), (0, 0, 270))):
            Circle(SKETCH23_R_2)
    extrude(amount=-CUT_EXTRUDE10_DEPTH, mode=Mode.SUBTRACT)

    # Boss-Extrude7 outline → Boss-Extrude7 (add)
    with BuildSketch(Plane(origin=(0, 0, 0), x_dir=(1, 0, 0), z_dir=(0, 1, 0)).offset(BOSS_EXTRUDE7_START)):
        with BuildLine():
            ThreePointArc((10.099635455, 140), (37.5, 174.916221554), (64.900364545, 140))
            Line((64.900364545, 140), (65.980202809, 140))
            ThreePointArc((65.980202809, 140), (37.5, 175.966221554), (9.019797191, 140))
            Line((9.019797191, 140), (10.099635455, 140))
        make_face()
        with BuildLine():
            Line((60.397200604, 140), (61.489347018, 140))
            ThreePointArc((61.489347018, 140), (37.5, 171.616221554), (13.510652982, 140))
            Line((13.510652982, 140), (14.602799396, 140))
            ThreePointArc((14.602799396, 140), (37.5, 170.566221554), (60.397200604, 140))
        make_face()
    extrude(amount=BOSS_EXTRUDE7_DEPTH)


solid = part.part
